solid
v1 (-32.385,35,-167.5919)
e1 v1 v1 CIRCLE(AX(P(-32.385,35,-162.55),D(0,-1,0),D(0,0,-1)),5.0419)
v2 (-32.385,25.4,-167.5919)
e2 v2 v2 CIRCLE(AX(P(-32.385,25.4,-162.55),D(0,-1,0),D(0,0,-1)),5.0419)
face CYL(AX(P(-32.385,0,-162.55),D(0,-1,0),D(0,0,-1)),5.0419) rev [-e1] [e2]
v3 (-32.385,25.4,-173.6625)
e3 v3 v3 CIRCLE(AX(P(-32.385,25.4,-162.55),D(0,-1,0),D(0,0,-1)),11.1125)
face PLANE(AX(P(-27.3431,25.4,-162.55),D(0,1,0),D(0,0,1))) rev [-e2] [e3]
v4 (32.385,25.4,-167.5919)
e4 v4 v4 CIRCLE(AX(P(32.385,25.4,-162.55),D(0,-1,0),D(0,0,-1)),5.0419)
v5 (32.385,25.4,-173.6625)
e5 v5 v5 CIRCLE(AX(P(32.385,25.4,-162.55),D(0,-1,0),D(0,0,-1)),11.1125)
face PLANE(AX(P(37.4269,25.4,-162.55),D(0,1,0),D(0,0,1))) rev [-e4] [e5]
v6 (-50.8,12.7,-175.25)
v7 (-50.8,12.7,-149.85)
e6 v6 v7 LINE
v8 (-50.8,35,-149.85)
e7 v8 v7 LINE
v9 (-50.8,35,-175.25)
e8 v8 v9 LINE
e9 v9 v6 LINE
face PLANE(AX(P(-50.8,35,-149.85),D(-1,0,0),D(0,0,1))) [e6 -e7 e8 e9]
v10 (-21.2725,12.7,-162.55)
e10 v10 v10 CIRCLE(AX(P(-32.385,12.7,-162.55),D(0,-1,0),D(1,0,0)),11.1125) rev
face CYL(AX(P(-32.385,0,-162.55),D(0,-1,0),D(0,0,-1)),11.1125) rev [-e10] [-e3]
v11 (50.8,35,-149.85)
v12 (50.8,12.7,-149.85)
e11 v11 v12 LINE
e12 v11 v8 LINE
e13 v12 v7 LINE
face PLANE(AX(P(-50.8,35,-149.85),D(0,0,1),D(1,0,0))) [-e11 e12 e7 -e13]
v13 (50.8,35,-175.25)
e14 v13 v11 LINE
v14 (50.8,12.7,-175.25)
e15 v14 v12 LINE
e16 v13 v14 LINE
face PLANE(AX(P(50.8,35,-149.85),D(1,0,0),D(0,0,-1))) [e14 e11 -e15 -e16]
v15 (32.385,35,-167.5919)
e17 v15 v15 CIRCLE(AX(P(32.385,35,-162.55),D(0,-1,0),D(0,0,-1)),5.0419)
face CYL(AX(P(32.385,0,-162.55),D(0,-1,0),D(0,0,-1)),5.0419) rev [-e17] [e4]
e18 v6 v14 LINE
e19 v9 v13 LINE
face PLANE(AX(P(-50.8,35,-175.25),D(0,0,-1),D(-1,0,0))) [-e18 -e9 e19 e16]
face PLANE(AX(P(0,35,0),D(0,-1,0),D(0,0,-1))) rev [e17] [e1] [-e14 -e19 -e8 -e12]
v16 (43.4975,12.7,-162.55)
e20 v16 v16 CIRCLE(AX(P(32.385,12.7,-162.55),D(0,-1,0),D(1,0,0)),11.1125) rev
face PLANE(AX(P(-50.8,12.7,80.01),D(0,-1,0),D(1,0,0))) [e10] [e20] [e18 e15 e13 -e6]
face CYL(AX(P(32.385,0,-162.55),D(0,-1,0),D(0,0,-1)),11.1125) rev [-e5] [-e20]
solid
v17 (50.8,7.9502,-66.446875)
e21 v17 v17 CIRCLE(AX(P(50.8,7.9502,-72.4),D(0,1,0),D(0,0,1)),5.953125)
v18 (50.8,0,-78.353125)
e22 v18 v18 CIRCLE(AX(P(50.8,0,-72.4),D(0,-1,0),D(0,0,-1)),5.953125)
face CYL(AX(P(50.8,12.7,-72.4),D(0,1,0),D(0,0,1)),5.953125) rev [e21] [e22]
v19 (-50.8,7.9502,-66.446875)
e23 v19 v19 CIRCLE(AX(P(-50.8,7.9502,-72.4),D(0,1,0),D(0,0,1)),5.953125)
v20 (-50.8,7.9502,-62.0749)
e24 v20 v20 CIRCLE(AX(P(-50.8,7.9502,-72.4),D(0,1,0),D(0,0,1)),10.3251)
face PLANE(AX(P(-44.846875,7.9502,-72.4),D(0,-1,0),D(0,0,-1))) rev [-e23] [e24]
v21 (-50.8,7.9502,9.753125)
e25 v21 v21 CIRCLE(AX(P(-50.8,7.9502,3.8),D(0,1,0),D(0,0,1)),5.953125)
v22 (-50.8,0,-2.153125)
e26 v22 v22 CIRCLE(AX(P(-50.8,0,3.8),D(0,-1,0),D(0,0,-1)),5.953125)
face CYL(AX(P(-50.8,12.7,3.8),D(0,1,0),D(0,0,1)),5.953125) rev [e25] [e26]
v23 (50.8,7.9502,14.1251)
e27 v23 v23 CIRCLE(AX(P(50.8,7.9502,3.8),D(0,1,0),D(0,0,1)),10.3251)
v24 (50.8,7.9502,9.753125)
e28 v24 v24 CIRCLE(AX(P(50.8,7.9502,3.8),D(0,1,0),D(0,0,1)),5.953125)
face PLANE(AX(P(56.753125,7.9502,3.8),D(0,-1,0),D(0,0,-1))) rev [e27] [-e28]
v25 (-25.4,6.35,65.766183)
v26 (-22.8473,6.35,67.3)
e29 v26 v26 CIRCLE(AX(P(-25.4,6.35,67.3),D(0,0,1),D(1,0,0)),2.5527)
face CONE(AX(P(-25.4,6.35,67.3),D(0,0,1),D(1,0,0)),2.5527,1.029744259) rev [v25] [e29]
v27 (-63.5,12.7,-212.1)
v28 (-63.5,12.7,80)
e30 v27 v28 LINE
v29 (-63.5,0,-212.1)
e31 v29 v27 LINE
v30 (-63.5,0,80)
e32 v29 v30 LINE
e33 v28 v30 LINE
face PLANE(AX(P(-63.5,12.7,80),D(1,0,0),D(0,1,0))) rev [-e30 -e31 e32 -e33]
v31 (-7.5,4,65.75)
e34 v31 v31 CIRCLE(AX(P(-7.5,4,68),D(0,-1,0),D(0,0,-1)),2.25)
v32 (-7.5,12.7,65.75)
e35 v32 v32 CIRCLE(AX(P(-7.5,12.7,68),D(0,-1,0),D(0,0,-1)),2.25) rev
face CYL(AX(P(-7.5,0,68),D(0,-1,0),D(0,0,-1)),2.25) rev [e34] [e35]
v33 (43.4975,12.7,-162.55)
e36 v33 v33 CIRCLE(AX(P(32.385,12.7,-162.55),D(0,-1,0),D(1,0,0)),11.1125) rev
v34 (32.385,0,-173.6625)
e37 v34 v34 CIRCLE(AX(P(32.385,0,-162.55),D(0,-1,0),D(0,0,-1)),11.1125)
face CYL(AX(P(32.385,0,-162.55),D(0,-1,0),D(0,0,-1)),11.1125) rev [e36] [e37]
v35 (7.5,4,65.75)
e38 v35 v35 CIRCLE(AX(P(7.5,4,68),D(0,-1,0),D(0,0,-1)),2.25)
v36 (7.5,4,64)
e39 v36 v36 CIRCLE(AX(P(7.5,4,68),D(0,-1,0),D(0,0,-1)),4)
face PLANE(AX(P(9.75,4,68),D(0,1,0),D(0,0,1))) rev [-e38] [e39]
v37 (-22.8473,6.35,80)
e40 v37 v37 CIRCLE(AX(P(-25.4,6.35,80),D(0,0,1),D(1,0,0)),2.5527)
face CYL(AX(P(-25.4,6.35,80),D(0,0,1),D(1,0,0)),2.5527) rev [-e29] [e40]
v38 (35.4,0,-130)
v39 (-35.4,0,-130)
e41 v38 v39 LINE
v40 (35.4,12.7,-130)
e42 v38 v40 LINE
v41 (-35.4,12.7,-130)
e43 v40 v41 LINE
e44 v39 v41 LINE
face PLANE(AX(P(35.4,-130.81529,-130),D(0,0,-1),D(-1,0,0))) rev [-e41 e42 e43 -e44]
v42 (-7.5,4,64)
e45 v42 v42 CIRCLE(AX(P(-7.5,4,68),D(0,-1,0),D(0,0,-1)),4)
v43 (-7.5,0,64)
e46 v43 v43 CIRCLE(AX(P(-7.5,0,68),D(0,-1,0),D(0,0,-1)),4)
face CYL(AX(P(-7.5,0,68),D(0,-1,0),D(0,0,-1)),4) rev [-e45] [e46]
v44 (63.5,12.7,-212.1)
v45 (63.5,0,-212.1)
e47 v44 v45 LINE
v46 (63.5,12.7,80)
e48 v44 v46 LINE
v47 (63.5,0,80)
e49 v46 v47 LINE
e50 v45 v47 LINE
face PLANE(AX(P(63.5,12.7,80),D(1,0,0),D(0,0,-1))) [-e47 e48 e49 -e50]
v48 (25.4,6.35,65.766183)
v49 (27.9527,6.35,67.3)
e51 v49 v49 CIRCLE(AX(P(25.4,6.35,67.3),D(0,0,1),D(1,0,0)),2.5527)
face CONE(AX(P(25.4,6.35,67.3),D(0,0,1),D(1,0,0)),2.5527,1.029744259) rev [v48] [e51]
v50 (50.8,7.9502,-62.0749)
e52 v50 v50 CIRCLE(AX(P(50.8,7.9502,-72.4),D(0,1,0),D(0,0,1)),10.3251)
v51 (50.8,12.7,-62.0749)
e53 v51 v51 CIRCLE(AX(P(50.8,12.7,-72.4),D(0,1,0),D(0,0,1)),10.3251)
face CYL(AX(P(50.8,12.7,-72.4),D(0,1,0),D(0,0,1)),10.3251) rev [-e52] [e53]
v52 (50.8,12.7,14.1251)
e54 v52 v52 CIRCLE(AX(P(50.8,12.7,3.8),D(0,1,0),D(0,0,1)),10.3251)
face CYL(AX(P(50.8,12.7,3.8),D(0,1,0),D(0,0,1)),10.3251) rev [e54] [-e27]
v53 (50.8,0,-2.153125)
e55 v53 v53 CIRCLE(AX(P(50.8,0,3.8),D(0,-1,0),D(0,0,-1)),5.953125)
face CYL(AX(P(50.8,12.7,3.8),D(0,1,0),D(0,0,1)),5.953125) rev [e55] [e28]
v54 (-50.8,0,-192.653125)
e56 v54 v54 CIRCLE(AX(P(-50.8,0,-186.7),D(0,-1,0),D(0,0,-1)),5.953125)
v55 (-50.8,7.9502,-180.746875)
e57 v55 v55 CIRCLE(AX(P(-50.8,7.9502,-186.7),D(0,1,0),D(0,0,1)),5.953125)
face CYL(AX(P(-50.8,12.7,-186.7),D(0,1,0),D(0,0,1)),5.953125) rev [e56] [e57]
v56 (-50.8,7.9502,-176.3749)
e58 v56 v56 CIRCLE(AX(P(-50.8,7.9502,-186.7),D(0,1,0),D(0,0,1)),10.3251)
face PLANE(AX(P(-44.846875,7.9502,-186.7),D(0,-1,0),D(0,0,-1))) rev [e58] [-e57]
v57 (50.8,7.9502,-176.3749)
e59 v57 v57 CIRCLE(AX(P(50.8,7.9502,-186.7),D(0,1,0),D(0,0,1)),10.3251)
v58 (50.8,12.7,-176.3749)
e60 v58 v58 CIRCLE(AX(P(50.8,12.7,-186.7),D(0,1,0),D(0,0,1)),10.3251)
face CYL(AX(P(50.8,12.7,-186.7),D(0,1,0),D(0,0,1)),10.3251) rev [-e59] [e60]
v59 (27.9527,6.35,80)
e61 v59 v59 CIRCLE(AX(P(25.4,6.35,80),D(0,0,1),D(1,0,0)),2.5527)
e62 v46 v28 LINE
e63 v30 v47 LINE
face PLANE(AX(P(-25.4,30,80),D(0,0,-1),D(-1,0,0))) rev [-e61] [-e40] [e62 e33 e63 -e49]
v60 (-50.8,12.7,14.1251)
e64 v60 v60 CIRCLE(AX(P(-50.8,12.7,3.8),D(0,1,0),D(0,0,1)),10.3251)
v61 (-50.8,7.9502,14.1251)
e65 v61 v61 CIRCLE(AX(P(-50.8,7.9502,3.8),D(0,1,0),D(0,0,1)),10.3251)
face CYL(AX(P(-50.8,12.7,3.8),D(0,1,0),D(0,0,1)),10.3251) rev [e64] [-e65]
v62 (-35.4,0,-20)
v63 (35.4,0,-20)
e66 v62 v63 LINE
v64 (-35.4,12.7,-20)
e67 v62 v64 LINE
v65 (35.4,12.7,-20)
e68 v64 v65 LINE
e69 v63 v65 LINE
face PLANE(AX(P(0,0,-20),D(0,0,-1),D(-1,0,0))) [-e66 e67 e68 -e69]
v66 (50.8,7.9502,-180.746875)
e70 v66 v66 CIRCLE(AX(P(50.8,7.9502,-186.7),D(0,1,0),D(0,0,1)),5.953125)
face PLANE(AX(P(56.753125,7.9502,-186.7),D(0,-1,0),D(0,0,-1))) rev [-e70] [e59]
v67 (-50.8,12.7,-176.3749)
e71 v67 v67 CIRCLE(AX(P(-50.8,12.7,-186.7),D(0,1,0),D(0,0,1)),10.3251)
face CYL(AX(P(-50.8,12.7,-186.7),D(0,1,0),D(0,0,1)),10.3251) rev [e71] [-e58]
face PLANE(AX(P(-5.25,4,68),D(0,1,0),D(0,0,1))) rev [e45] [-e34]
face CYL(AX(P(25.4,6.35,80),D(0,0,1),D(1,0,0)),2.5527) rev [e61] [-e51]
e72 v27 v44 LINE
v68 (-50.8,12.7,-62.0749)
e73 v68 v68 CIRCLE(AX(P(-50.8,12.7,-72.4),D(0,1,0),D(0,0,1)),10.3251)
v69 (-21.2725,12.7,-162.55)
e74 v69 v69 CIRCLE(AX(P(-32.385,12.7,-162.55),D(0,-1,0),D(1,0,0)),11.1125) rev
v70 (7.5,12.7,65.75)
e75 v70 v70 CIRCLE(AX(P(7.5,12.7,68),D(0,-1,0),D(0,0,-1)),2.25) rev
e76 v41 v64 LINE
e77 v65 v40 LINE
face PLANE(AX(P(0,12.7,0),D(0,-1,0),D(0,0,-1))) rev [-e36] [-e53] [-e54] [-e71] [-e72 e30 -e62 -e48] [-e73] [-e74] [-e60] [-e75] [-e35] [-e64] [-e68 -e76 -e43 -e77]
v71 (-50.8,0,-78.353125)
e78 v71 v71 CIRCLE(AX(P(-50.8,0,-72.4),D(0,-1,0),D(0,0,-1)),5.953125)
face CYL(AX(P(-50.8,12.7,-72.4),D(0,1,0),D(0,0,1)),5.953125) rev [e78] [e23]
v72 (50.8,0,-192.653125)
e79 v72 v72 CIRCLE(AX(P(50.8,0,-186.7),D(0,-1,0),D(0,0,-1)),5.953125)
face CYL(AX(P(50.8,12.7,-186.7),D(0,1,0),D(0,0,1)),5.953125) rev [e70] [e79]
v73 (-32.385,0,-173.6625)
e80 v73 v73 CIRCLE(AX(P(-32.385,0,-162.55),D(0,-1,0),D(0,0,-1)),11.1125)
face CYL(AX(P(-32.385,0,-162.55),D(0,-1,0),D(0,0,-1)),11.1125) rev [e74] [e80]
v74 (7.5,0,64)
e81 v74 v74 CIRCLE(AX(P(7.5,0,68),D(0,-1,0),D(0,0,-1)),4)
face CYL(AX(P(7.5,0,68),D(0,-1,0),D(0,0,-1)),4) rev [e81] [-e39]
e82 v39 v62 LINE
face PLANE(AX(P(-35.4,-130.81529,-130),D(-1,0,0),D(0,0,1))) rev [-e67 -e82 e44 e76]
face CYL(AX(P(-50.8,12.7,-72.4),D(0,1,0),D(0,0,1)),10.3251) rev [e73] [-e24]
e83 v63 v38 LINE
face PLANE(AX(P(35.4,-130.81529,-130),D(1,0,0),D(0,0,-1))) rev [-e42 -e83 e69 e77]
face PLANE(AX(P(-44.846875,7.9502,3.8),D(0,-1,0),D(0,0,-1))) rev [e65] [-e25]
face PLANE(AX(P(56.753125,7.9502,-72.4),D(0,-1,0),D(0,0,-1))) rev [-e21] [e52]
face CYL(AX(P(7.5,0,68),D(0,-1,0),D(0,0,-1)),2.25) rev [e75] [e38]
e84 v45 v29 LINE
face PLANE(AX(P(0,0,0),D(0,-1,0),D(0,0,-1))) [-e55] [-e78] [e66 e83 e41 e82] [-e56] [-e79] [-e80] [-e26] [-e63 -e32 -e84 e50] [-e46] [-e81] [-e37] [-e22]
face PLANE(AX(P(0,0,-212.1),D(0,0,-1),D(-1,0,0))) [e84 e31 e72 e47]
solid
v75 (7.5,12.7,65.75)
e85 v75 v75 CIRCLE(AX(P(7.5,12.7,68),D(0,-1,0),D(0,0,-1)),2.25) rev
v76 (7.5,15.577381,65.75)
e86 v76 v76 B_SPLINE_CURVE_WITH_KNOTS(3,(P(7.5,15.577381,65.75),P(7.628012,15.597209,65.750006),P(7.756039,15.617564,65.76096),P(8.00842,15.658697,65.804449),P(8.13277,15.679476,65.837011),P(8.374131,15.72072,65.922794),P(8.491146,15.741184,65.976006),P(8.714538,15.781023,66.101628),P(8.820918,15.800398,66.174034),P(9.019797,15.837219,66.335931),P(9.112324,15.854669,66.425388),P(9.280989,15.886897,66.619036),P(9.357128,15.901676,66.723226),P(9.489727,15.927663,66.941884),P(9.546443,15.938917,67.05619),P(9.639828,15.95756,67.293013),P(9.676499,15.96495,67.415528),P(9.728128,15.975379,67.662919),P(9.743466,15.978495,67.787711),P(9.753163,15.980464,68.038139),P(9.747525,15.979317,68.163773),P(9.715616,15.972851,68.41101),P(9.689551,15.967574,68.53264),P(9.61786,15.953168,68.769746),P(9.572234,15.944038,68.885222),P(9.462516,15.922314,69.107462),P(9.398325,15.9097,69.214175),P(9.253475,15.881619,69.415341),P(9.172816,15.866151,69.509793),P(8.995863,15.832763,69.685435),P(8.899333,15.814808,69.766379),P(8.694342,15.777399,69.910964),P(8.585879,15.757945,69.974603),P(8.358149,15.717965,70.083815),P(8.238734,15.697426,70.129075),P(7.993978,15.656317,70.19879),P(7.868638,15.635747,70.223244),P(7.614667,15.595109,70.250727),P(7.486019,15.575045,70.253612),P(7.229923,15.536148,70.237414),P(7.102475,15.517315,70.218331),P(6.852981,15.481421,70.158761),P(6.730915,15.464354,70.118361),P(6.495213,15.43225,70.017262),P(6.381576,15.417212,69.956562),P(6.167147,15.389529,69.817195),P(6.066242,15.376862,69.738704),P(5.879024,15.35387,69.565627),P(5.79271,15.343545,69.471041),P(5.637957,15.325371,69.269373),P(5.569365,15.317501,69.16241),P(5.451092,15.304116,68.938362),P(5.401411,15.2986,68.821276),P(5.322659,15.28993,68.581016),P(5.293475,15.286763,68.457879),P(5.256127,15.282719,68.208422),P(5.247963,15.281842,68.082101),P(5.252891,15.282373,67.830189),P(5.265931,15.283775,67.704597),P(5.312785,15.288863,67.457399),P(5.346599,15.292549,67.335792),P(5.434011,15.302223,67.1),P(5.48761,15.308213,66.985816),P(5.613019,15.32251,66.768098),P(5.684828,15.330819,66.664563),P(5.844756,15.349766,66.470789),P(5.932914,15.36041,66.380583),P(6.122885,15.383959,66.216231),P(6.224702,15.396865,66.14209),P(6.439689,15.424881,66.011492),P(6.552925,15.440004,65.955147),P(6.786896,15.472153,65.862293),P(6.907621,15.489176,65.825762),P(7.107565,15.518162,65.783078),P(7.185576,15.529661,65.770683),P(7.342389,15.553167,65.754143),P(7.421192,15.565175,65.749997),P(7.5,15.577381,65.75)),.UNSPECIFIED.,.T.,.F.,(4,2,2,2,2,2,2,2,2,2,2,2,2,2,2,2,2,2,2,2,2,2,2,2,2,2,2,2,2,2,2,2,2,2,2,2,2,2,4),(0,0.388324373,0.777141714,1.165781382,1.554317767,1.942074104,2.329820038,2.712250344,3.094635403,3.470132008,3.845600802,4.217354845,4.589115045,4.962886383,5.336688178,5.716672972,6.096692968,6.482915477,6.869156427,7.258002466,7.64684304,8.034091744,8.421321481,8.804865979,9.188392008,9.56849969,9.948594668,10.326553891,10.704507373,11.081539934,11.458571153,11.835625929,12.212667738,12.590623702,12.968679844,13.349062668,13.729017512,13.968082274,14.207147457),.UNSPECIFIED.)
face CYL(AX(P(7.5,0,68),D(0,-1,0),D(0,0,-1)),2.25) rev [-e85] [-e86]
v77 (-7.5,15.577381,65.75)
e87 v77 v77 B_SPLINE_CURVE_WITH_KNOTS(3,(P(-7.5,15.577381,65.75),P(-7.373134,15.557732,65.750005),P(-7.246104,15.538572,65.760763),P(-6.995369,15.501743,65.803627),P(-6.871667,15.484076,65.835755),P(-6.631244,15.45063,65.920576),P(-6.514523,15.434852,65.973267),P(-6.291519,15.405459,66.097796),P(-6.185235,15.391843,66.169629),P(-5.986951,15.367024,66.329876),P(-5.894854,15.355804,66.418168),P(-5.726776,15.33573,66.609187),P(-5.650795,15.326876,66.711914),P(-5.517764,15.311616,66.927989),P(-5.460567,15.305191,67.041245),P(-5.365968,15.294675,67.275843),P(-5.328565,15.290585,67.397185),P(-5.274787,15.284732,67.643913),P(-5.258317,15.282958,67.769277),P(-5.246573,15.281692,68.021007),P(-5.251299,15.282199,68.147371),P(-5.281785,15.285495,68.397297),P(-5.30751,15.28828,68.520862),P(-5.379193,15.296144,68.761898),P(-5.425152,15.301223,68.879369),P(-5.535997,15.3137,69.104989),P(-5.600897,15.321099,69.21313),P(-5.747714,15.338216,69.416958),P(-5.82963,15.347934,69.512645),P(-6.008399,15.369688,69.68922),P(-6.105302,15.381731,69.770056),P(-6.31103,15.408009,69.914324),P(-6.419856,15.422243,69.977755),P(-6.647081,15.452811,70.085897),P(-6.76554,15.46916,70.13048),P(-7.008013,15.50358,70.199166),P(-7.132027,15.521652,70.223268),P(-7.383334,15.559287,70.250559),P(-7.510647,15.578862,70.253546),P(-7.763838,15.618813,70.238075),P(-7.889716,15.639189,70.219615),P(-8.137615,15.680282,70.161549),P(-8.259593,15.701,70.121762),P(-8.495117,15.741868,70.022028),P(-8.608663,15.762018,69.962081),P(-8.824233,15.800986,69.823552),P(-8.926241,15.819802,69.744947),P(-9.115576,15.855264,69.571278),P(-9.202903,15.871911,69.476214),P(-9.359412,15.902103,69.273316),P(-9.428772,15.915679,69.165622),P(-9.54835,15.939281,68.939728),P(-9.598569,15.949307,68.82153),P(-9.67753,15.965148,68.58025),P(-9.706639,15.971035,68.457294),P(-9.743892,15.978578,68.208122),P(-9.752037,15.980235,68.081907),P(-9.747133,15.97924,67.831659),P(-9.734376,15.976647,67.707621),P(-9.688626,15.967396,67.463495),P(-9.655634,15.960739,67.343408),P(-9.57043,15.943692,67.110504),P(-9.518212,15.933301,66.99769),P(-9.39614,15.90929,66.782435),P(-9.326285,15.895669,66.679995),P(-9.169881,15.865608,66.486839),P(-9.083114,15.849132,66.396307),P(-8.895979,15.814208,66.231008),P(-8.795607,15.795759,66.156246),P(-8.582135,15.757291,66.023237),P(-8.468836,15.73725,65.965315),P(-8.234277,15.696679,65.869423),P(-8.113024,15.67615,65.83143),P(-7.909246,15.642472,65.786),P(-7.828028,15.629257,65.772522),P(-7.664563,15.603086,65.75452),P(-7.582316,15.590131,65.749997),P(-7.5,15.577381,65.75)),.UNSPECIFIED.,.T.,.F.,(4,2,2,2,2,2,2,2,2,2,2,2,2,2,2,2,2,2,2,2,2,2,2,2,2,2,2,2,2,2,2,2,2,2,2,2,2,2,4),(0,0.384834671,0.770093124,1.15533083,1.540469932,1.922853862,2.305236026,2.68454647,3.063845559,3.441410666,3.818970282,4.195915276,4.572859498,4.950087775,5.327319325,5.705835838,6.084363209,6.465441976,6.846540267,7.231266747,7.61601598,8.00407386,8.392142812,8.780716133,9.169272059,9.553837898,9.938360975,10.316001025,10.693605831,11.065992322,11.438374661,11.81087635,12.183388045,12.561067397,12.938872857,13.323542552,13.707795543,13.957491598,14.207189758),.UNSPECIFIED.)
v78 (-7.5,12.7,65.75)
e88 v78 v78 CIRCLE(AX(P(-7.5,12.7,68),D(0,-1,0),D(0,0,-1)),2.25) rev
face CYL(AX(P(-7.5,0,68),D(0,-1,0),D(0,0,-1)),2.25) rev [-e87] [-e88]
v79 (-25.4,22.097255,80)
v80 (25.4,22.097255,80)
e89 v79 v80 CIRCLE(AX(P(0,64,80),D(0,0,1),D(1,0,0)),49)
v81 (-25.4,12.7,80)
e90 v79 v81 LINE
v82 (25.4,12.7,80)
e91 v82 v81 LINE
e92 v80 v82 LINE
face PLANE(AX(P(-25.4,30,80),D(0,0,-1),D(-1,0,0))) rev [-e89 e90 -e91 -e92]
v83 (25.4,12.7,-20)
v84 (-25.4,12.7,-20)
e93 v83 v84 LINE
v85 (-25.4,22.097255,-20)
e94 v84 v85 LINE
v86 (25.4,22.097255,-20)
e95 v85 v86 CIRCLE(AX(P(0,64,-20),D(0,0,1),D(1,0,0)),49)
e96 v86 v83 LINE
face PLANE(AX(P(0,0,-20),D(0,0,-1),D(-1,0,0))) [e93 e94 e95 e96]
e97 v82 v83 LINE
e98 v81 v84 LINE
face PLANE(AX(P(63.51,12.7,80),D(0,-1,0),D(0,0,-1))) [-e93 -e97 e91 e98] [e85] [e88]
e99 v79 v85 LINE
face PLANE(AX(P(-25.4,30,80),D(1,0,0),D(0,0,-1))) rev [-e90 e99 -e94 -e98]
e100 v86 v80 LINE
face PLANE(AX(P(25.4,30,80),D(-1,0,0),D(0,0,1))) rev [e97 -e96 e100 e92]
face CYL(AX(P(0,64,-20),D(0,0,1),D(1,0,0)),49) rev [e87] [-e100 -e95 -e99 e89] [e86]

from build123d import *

# Parameters (mm, degrees)
SKETCH1_W                                = 50.8
SKETCH1_H                                = 160
BOSS_EXTRUDE1_DEPTH                      = 30
SKETCH4_R                                = 49
CUT_EXTRUDE1_DEPTH                       = 100
CBORE_FOR_M4_SHCS1_D                     = 4.5
CBORE_FOR_M4_SHCS1_CBORE_D               = 8
CBORE_FOR_M4_SHCS1_CBORE_DEPTH           = 4
SKETCH7_R                                = 57
CUT_EXTRUDE10_DEPTH                      = 60
SKETCH39_W                               = 38.1
SKETCH39_H                               = 304.8
BOSS_EXTRUDE9_DEPTH                      = 12.7
SKETCH30_W                               = 101.6
SKETCH30_H                               = 25.4
BOSS_EXTRUDE8_DEPTH                      = 35
SKETCH40_W                               = 50.8
SKETCH40_H                               = 144.8
BOSS_EXTRUDE10_DEPTH                     = 12.7
HOLE1_D                                  = 11.90625
HOLE1_CBORE_D                            = 20.6502
HOLE1_CBORE_DEPTH                        = 4.7498
TAP_DRILL_FOR_1_4_20_TAP1_D              = 5.1054
TAP_DRILL_FOR_1_4_20_TAP1_DEPTH          = 12.7
TAP_DRILL_FOR_1_4_20_TAP1_TIP            = 1.533816902
CUT_EXTRUDE11_START                      = -12.7
SKETCH44_W                               = 70.8
SKETCH44_H                               = 110
CUT_EXTRUDE11_DEPTH                      = 12.972164
CBORE_FOR_3_8_HEX_HEAD_BOLT1_D           = 10.0838
CBORE_FOR_3_8_HEX_HEAD_BOLT1_CBORE_D     = 22.225
CBORE_FOR_3_8_HEX_HEAD_BOLT1_CBORE_DEPTH = 25.4
SKETCH45_W                               = 127
SKETCH45_H                               = 12.7
CUT_EXTRUDE12_DEPTH                      = 12.7
SPLIT1_SURFACE_1_BACK                    = 321.432
SPLIT1_SURFACE_1_DEPTH                   = 642.864
SPLIT1_SURFACE_2_BACK                    = 321.432
SPLIT1_SURFACE_2_DEPTH                   = 642.864


# Read off the part's stored shape, not the designer's step: Split2
with BuildPart() as part:
    # Sketch1 → Boss-Extrude1 (new body)
    with BuildSketch(Plane(origin=(0, 0, 0), x_dir=(1, 0, 0), z_dir=(0, 1, 0))):
        Rectangle(SKETCH1_W, SKETCH1_H)
    extrude(amount=BOSS_EXTRUDE1_DEPTH)

    # Sketch4 → Cut-Extrude1 (cut)
    with BuildSketch(Plane.XY.offset(80)):
        with Locations((0, 64)):
            Circle(SKETCH4_R)
    extrude(amount=-CUT_EXTRUDE1_DEPTH, mode=Mode.SUBTRACT)

    # CBORE for M4 SHCS1 (through all)
    with Locations(Plane(origin=(0, 0, 0), x_dir=(-1, 0, 0), z_dir=(0, -1, 0))):
        with Locations((7.5, -68), (-7.5, -68)):
            CounterBoreHole(CBORE_FOR_M4_SHCS1_D / 2, CBORE_FOR_M4_SHCS1_CBORE_D / 2, CBORE_FOR_M4_SHCS1_CBORE_DEPTH)

    # Sketch7 → Cut-Extrude10 (cut)
    with BuildSketch(Plane(origin=(0, 0, -80), x_dir=(-1, 0, 0), z_dir=(0, 0, -1))):
        with Locations((0, 64)):
            Circle(SKETCH7_R)
    extrude(amount=-CUT_EXTRUDE10_DEPTH, mode=Mode.SUBTRACT)

    # Sketch39 → Boss-Extrude9 (add)
    with BuildSketch(Plane(origin=(0, 0, 0), x_dir=(-1, 0, 0), z_dir=(0, -1, 0))):
        with Locations((-44.45, 72.4)):
            Rectangle(SKETCH39_W, SKETCH39_H)
    boss_extrude9 = extrude(amount=-BOSS_EXTRUDE9_DEPTH)

    # Sketch30 → Boss-Extrude8 (add)
    with BuildSketch(Plane(origin=(0, 0, 0), x_dir=(-1, 0, 0), z_dir=(0, -1, 0))):
        with Locations((0, 162.55)):
            Rectangle(SKETCH30_W, SKETCH30_H)
    extrude(amount=-BOSS_EXTRUDE8_DEPTH)

    # Sketch40 → Boss-Extrude10 (add)
    with BuildSketch(Plane(origin=(0, 0, 0), x_dir=(-1, 0, 0), z_dir=(0, -1, 0))):
        with Locations((0, 152.4)):
            Rectangle(SKETCH40_W, SKETCH40_H)
    extrude(amount=-BOSS_EXTRUDE10_DEPTH)

    # Hole1 (through all)
    with Locations(Plane(origin=(0, 12.7, 0), x_dir=(1, 0, 0), z_dir=(0, 1, 0))):
        with Locations((50.8, -3.8), (50.8, 186.7), (50.8, 72.4)):
            hole1 = CounterBoreHole(HOLE1_D / 2, HOLE1_CBORE_D / 2, HOLE1_CBORE_DEPTH)

    # Mirror1: Boss-Extrude9, Hole1 across plane
    add(boss_extrude9.mirror(Plane(origin=(0, 0, 0), x_dir=(0, 0, 1), z_dir=(1, 0, 0))))
    add(hole1.mirror(Plane(origin=(0, 0, 0), x_dir=(0, 0, 1), z_dir=(1, 0, 0))), mode=Mode.SUBTRACT)

    # Tap Drill for 1/4-20 Tap1
    with Locations(Plane.XY.offset(80)):
        with Locations((25.4, 6.35), (-25.4, 6.35)):
            Hole(TAP_DRILL_FOR_1_4_20_TAP1_D / 2, depth=TAP_DRILL_FOR_1_4_20_TAP1_DEPTH)
            with Locations((0, 0, -(TAP_DRILL_FOR_1_4_20_TAP1_DEPTH + TAP_DRILL_FOR_1_4_20_TAP1_TIP / 2))):  # 118° drill point
                Cone(0, TAP_DRILL_FOR_1_4_20_TAP1_D / 2, TAP_DRILL_FOR_1_4_20_TAP1_TIP, mode=Mode.SUBTRACT)

    # Sketch44 → Cut-Extrude11 (cut)
    with BuildSketch(Plane(origin=(0, 12.7, 0), x_dir=(1, 0, 0), z_dir=(0, 1, 0)).offset(CUT_EXTRUDE11_START)):
        with Locations((0, 75)):
            Rectangle(SKETCH44_W, SKETCH44_H)
    extrude(amount=CUT_EXTRUDE11_DEPTH, mode=Mode.SUBTRACT)

    # CBORE for 3/8 Hex Head Bolt1 (through all)
    with Locations(Plane.XZ):
        with Locations((32.385, -162.55), (-32.385, -162.55)):
            CounterBoreHole(CBORE_FOR_3_8_HEX_HEAD_BOLT1_D / 2, CBORE_FOR_3_8_HEX_HEAD_BOLT1_CBORE_D / 2, CBORE_FOR_3_8_HEX_HEAD_BOLT1_CBORE_DEPTH)

    # Sketch45 → Cut-Extrude12 (cut)
    with BuildSketch(Plane(origin=(0, 0, -224.8), x_dir=(-1, 0, 0), z_dir=(0, 0, -1))):
        with Locations((0, 6.35)):
            Rectangle(SKETCH45_W, SKETCH45_H)
    extrude(amount=-CUT_EXTRUDE12_DEPTH, mode=Mode.SUBTRACT)


with BuildPart() as body_2:
    # Split1: the piece behind the surface
    add(part.part)
    # Split1 surface: a surface, the sketch's curves swept straight by 642.864 mm
    with BuildLine(Plane.ZY.offset(25.4).offset(-SPLIT1_SURFACE_1_BACK), mode=Mode.PRIVATE) as split1_surface_1_path:
        Line((-20, 12.7), (-20, 22.09725546))
        Line((-20, 22.09725546), (80, 22.09725546))
        Line((80, 22.09725546), (80, 12.7))
        Line((80, 12.7), (-20, 12.7))
    split1_surface_1 = Shell.extrude(split1_surface_1_path.wire(), (-1 * SPLIT1_SURFACE_1_DEPTH, 0 * SPLIT1_SURFACE_1_DEPTH, 0 * SPLIT1_SURFACE_1_DEPTH))
    split(bisect_by=split1_surface_1, keep=Keep.BOTTOM)


with BuildPart() as part_1:
    add(part.part)

    # Split1: split by a surface, the side it looks to stays
    # Split1 surface: a surface, the sketch's curves swept straight by 642.864 mm
    with BuildLine(Plane.ZY.offset(25.4).offset(-SPLIT1_SURFACE_2_BACK), mode=Mode.PRIVATE) as split1_surface_2_path:
        Line((-20, 12.7), (-20, 22.09725546))
        Line((-20, 22.09725546), (80, 22.09725546))
        Line((80, 22.09725546), (80, 12.7))
        Line((80, 12.7), (-20, 12.7))
    split1_surface_2 = Shell.extrude(split1_surface_2_path.wire(), (-1 * SPLIT1_SURFACE_2_DEPTH, 0 * SPLIT1_SURFACE_2_DEPTH, 0 * SPLIT1_SURFACE_2_DEPTH))
    split(bisect_by=split1_surface_2, keep=Keep.TOP)


with BuildPart() as body_3:
    # Split2: the piece on the far side of the plane
    add(part_1.part)
    split(bisect_by=Plane(origin=(0, 12.7, 0), x_dir=(1, 0, 0), z_dir=(0, 1, 0)), keep=Keep.BOTTOM)


with BuildPart() as part_2:
    add(part_1.part)

    # Split2
    split(bisect_by=Plane(origin=(0, 12.7, 0), x_dir=(1, 0, 0), z_dir=(0, 1, 0)), keep=Keep.TOP)


solid = Compound([body_2.part, body_3.part, part_2.part])
